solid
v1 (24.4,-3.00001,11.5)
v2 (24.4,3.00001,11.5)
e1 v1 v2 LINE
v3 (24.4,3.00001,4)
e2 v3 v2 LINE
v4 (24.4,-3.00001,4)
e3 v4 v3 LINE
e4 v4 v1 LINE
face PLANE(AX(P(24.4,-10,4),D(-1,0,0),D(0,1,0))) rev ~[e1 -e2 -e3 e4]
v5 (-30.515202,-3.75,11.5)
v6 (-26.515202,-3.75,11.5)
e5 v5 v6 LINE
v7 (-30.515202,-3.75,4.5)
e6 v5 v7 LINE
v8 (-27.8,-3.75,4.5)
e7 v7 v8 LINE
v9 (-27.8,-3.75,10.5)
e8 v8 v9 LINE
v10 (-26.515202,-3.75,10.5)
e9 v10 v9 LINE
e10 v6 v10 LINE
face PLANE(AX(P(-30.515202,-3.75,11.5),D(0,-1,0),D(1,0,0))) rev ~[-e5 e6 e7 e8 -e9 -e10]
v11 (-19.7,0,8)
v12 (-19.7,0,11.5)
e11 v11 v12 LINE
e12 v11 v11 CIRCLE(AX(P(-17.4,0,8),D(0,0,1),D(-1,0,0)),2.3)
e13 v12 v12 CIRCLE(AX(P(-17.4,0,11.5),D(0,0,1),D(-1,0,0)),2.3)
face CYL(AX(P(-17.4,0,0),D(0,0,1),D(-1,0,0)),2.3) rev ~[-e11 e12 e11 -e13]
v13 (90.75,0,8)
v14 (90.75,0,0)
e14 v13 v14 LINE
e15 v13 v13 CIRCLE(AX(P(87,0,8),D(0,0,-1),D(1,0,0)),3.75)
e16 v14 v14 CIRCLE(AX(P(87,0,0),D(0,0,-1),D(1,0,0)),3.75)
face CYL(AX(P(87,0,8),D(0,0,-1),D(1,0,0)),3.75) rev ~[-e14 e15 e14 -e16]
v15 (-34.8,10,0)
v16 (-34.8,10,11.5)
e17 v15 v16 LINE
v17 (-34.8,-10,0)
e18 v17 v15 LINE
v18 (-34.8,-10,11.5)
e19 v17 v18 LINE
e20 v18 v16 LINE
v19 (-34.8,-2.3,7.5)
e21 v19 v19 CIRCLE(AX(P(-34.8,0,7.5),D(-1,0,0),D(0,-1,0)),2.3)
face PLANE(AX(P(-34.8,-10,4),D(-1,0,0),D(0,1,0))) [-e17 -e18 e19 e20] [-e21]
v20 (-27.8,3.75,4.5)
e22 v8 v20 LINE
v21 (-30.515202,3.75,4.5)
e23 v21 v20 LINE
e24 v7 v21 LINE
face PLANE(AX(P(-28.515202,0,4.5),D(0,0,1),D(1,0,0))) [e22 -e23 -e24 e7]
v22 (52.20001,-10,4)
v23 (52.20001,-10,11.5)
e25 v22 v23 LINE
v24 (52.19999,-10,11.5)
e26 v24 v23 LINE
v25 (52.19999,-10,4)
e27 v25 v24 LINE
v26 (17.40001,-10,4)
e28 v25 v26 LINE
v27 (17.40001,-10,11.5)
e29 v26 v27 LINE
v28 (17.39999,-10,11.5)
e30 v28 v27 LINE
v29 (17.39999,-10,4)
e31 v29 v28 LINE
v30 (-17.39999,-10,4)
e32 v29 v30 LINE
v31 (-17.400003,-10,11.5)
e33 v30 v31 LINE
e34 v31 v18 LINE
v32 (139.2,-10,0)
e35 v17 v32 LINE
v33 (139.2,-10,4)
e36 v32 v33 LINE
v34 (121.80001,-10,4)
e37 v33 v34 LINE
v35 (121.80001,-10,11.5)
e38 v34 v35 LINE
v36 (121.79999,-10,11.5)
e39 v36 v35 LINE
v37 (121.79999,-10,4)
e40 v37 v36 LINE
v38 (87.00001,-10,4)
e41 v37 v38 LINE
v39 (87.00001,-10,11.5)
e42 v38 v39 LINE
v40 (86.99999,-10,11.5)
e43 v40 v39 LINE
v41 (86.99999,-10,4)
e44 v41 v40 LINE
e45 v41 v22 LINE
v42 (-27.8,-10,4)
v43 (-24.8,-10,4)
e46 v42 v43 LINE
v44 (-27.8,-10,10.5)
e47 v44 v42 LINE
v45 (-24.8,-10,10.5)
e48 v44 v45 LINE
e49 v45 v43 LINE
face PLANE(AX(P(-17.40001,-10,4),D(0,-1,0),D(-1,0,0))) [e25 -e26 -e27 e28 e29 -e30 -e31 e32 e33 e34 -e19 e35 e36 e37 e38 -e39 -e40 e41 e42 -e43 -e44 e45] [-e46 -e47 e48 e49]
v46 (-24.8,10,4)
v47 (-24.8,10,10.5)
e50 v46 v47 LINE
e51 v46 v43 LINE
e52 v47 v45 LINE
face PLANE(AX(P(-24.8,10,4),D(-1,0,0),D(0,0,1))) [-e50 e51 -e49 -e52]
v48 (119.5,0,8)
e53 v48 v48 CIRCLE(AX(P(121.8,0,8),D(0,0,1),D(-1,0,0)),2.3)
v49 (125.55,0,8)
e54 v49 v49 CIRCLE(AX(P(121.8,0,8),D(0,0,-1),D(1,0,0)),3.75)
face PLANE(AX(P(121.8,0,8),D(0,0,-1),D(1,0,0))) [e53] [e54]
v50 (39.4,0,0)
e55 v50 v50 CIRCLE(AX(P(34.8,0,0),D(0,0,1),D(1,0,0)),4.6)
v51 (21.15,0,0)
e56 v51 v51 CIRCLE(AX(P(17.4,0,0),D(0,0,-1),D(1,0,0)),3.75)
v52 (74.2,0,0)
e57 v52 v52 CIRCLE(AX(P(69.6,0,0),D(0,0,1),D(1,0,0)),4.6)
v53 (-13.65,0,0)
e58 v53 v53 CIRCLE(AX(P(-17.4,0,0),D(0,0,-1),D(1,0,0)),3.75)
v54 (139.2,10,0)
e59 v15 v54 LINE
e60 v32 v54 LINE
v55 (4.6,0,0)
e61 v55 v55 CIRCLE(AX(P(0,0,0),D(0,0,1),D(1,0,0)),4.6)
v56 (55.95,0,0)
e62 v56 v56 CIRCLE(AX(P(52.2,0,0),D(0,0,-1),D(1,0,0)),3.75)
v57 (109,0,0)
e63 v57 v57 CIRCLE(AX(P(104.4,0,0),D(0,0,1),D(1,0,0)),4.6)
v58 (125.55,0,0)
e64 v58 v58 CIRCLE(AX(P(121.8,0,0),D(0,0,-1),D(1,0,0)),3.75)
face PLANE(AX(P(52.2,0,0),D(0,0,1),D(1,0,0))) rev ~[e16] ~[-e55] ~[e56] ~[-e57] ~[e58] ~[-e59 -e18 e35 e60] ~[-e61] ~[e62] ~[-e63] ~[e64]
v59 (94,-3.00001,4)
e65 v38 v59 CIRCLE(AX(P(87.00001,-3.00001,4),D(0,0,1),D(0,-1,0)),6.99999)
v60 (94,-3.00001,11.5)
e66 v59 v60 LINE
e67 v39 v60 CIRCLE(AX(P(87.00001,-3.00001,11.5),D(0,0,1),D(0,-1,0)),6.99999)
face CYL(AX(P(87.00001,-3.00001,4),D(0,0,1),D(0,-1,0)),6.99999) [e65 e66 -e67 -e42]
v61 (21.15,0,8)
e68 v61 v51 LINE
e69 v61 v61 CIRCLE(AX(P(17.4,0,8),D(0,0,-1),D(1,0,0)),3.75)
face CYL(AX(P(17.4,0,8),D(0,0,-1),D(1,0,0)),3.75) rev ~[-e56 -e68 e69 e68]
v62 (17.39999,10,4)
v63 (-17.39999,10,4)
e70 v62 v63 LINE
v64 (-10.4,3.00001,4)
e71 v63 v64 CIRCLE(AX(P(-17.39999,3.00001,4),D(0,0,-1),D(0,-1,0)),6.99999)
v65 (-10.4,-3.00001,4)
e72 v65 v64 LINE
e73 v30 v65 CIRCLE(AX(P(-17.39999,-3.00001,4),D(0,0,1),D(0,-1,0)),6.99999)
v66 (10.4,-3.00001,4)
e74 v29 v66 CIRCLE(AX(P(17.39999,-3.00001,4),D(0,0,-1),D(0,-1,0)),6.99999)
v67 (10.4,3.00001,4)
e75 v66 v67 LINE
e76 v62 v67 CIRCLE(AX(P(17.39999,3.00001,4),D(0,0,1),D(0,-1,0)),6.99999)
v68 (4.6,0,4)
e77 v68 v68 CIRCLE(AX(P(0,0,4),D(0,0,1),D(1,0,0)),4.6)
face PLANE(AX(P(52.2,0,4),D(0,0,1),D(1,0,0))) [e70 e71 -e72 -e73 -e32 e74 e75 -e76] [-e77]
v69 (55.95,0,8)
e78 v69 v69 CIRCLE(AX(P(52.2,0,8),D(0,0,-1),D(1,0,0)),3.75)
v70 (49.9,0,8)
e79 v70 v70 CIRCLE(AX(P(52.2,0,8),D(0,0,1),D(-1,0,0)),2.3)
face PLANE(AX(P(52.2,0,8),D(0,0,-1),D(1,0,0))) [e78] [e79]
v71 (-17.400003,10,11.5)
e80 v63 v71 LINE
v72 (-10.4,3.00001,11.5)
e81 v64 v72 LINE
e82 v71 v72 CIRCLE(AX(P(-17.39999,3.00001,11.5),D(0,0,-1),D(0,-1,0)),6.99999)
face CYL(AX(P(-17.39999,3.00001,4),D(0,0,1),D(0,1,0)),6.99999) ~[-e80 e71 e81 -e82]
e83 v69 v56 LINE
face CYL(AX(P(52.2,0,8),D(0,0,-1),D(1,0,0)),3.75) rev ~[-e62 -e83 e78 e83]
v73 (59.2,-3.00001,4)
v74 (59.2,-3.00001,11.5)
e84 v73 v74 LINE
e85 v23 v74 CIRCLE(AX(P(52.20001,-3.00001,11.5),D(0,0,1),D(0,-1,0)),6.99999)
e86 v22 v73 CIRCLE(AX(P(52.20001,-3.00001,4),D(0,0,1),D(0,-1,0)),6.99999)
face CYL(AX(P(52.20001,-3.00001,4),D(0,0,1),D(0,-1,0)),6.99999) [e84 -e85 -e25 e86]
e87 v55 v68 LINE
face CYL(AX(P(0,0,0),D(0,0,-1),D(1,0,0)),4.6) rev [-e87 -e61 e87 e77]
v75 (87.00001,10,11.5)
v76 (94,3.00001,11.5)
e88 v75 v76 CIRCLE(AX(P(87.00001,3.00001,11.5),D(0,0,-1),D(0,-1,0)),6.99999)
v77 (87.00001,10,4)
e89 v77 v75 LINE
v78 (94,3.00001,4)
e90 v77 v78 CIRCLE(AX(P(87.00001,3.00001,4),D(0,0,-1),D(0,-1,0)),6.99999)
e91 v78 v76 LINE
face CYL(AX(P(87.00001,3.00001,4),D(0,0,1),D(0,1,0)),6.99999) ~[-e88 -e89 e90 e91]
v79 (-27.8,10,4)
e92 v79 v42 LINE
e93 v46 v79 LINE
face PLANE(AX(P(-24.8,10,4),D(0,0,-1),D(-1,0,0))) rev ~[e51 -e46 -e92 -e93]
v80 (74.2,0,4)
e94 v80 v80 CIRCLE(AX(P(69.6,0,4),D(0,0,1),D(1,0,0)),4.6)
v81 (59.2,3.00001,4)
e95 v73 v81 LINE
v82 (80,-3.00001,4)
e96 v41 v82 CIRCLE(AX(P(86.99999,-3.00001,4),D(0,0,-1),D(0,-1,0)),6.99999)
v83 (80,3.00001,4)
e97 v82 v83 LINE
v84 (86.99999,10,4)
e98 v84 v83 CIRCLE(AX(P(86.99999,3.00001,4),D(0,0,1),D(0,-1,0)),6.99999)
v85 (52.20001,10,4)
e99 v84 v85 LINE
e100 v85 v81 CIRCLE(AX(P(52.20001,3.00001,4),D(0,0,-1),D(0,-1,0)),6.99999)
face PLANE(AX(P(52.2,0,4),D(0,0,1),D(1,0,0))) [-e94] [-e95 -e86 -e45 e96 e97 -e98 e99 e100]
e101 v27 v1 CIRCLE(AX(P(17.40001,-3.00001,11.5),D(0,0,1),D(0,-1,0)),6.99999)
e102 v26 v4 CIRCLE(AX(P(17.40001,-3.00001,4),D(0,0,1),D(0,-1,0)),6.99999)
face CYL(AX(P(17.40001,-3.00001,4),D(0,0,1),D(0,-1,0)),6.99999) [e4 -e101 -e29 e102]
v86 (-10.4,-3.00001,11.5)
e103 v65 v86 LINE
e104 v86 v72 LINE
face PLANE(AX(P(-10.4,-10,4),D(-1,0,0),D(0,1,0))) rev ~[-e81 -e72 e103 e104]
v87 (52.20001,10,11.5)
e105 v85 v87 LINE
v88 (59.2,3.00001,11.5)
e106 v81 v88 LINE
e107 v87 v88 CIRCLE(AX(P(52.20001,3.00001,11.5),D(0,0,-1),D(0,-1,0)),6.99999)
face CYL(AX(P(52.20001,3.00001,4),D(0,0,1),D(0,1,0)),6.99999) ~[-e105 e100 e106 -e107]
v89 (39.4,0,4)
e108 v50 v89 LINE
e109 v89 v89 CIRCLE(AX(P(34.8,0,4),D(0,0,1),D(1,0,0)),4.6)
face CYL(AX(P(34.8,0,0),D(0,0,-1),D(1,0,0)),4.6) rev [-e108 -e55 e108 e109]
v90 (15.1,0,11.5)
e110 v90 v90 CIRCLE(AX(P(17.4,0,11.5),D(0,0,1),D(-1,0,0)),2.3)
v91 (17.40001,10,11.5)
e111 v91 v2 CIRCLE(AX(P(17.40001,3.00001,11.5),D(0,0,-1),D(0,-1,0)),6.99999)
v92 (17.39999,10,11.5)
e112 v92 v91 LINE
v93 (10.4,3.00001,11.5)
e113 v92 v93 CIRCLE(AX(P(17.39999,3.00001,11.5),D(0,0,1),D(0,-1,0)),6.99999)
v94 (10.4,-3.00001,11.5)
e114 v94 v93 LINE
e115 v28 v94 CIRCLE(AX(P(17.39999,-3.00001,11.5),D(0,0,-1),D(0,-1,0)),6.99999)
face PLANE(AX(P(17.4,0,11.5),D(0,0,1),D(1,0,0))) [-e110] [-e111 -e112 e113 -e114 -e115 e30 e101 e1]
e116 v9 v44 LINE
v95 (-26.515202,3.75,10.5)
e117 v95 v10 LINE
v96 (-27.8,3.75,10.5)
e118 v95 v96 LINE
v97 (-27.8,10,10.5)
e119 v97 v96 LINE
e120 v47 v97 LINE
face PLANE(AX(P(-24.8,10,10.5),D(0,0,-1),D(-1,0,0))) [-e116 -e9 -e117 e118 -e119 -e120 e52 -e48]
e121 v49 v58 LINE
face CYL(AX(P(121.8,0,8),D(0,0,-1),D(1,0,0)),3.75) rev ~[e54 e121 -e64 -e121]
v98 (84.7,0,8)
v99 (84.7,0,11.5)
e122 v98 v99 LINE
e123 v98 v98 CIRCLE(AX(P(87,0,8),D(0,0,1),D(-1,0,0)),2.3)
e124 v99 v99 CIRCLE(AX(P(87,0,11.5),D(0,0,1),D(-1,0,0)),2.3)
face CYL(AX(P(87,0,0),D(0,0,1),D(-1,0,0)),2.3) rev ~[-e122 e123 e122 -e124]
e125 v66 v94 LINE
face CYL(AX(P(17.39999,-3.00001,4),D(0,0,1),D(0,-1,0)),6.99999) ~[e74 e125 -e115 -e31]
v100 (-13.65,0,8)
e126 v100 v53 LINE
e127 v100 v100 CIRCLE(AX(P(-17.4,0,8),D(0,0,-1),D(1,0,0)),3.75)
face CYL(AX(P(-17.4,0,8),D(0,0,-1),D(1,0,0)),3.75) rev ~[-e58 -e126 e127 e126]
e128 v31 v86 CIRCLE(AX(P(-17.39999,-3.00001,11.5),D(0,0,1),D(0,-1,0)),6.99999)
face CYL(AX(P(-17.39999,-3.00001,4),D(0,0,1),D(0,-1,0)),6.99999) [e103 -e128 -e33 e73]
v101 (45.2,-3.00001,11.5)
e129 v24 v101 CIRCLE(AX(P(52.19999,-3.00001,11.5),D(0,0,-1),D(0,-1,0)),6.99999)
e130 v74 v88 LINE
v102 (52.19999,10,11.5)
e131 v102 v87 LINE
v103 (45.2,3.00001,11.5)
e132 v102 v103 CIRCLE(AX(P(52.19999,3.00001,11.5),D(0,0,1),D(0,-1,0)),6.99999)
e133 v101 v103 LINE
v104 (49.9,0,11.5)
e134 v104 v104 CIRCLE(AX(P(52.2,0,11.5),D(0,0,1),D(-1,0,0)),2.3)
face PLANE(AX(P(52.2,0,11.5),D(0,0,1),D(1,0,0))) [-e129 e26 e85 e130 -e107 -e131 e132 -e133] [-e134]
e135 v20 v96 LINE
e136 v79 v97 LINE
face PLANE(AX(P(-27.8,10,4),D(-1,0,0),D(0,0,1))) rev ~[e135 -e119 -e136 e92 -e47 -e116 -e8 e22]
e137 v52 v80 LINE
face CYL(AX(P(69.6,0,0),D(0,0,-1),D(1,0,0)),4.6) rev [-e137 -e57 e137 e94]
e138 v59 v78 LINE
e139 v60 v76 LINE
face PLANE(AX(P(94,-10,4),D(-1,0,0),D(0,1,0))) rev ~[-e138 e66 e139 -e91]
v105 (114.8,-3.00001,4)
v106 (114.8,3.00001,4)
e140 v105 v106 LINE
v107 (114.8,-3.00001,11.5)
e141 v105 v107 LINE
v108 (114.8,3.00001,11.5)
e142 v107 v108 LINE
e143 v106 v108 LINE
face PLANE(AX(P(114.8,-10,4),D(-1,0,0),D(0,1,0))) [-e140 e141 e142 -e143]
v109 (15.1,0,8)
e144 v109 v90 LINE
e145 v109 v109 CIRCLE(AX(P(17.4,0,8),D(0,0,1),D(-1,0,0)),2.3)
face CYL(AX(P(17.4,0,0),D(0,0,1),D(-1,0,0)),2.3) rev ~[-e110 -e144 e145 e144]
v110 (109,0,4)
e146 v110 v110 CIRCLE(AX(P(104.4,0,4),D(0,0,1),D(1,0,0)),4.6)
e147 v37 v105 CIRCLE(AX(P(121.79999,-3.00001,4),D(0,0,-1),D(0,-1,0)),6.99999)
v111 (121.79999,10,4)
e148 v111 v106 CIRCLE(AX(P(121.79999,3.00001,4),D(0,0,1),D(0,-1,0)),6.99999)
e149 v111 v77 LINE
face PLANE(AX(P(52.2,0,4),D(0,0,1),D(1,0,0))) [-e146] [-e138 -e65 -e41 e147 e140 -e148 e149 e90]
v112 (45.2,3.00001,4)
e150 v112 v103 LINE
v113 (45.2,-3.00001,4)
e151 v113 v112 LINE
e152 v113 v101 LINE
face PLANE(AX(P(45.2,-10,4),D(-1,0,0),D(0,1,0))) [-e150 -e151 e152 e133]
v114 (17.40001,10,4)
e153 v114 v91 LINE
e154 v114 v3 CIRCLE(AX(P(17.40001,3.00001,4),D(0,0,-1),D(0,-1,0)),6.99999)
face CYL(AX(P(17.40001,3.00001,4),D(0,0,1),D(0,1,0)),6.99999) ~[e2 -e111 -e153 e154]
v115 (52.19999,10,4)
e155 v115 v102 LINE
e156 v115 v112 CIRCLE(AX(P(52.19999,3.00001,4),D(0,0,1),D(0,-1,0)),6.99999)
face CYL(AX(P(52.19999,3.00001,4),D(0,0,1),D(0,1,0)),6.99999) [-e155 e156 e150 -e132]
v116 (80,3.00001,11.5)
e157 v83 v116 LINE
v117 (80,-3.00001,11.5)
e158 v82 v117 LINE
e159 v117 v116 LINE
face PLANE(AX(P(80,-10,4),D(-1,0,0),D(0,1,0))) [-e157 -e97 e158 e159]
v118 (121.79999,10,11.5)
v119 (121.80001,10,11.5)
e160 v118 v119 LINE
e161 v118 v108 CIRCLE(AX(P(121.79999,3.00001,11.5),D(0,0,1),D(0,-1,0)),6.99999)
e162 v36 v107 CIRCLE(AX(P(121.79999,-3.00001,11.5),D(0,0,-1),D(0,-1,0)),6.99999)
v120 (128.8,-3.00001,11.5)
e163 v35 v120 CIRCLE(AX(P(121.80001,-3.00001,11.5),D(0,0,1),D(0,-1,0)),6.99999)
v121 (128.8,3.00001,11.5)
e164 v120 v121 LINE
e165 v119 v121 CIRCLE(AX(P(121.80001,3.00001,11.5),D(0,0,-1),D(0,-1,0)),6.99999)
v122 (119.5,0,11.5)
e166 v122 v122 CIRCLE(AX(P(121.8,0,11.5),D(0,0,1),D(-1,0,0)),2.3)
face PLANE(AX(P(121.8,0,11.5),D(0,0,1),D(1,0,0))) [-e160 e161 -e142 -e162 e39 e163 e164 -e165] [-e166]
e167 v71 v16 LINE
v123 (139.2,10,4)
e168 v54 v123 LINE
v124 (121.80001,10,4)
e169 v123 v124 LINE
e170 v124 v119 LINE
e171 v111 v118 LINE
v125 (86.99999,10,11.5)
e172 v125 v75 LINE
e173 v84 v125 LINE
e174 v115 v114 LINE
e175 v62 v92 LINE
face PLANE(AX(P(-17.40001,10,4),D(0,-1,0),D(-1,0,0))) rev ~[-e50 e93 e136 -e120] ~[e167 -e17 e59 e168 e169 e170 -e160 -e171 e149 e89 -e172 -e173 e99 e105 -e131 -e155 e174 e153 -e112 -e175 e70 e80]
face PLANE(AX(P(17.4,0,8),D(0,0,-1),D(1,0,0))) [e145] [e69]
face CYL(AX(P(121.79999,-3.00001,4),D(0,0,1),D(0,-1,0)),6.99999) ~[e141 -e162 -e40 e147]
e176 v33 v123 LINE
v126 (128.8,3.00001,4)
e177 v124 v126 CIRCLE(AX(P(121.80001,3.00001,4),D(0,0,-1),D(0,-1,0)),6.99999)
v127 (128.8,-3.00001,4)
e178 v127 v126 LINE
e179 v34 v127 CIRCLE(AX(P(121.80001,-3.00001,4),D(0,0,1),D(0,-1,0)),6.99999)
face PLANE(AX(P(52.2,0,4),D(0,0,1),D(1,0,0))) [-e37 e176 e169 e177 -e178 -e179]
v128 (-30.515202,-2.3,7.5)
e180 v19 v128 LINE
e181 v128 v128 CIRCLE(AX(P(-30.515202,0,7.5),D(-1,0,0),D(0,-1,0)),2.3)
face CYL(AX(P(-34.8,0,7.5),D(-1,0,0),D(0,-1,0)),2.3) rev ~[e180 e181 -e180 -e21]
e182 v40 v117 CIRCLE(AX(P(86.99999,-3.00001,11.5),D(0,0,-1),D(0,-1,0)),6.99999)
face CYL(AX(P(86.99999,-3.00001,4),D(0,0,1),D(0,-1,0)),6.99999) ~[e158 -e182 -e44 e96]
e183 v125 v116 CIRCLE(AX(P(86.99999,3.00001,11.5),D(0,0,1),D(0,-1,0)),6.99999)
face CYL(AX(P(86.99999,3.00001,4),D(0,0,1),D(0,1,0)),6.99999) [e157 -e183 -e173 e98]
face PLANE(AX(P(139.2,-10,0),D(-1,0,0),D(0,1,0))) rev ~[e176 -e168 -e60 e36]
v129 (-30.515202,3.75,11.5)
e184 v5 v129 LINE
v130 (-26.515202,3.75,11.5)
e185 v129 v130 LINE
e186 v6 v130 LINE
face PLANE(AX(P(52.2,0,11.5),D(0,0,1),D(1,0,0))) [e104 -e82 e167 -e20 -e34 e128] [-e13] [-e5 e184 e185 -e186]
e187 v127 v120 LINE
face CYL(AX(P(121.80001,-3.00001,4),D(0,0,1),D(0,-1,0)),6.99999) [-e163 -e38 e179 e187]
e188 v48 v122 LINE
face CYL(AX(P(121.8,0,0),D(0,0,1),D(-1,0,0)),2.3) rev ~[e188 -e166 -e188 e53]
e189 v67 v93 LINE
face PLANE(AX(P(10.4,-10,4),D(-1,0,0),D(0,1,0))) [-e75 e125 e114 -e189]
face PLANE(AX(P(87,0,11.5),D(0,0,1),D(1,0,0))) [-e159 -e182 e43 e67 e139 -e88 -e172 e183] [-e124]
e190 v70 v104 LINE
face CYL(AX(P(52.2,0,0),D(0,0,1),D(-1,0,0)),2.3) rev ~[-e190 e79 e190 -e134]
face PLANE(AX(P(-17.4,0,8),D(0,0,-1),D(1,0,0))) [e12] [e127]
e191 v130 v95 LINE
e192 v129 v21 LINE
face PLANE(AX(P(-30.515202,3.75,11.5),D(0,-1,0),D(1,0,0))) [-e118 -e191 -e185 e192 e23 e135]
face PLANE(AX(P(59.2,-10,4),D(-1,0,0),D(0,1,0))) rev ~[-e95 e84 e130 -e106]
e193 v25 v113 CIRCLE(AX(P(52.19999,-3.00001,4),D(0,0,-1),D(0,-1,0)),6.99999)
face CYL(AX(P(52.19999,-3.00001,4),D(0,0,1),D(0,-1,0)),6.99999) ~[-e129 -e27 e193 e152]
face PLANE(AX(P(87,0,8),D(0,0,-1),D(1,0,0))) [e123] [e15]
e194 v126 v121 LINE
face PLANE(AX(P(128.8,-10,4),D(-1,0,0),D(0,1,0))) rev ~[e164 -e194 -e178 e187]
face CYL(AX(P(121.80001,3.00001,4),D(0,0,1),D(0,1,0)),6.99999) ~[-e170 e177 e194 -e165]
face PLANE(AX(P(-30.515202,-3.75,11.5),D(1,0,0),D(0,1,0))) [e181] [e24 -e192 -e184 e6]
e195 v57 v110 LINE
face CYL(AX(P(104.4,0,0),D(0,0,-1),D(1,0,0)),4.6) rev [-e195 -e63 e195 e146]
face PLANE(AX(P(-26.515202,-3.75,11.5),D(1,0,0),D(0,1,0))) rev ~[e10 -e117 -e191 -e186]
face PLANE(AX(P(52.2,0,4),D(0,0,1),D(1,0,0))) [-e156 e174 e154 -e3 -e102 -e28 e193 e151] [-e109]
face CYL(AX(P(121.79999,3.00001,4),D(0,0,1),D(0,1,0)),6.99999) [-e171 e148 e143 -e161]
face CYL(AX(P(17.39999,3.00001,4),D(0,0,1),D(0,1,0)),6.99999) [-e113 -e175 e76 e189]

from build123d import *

# Parameters (mm, degrees)
F0_W           = 174
F0_H           = 20
F0_R           = 4.6
F1_DEPTH       = 4
F2_W           = 14
F2_H           = 20
F3_DEPTH       = 7.5
F5_D           = 4.6
F5_CBORE_D     = 7.5
F5_CBORE_DEPTH = 8
F6_R           = 6.99999
F7_DEPTH       = 7.5
F8_W           = 3
F8_H           = 6.5
F9_DEPTH       = 25
F10_W          = 4
F10_H          = 7.5
F11_DEPTH      = 7
F12_R          = 2.3
F13_DEPTH      = 10


# Not quite as in the source:
# - a fillet or chamfer is up to 0.001 mm smaller than in the source, because OpenCascade refuses the exact size


with BuildPart() as f1:
    # F0 (on Top) → F1 (new body)
    with BuildSketch(Plane.XY):
        with Locations((52.2, 0)):
            Rectangle(F0_W, F0_H)
        Circle(F0_R, mode=Mode.SUBTRACT)
        with Locations((34.8, 0)):
            Circle(F0_R, mode=Mode.SUBTRACT)
        with Locations((69.6, 0)):
            Circle(F0_R, mode=Mode.SUBTRACT)
        with Locations((104.4, 0)):
            Circle(F0_R, mode=Mode.SUBTRACT)
    extrude(amount=F1_DEPTH)

    # F2 (on face) → F3 (join)
    with BuildSketch(Plane.XY.offset(4)):
        with Locations((-17.4, 0)):
            Rectangle(F2_W, F2_H)
        with Locations((17.4, 0)):
            Rectangle(F2_W, F2_H)
        with Locations((52.2, 0)):
            Rectangle(F2_W, F2_H)
        with Locations((87, 0)):
            Rectangle(F2_W, F2_H)
        with Locations((121.8, 0)):
            Rectangle(F2_W, F2_H)
    extrude(amount=F3_DEPTH)

    # F5 (through all)
    with Locations(Plane(origin=(0, 0, 0), x_dir=(1, 0, 0), z_dir=(0, 0, -1))):
        with Locations((-17.4, 0), (17.4, 0), (52.2, 0), (87, 0), (121.8, 0)):
            CounterBoreHole(F5_D / 2, F5_CBORE_D / 2, F5_CBORE_DEPTH)

    # F6 (radius 7 in the source; OpenCascade refuses exactly that, so slightly less here)
    f6_edges = [f1.edges().sort_by_distance(p)[0] for p in [
        (-10.4, 10, 7.75),
        (10.4, 10, 7.75),
        (24.4, 10, 7.75),
        (45.2, 10, 7.75),
        (59.2, 10, 7.75),
        (80, 10, 7.75),
        (94, 10, 7.75),
        (128.8, 10, 7.75),
        (114.8, 10, 7.75),
        (-24.4, 10, 7.75),
        (-24.4, -10, 7.75),
        (-10.4, -10, 7.75),
        (10.4, -10, 7.75),
        (24.4, -10, 7.75),
        (45.2, -10, 7.75),
        (59.2, -10, 7.75),
        (80, -10, 7.75),
        (94, -10, 7.75),
        (114.8, -10, 7.75),
        (128.8, -10, 7.75),
    ]]
    fillet(f6_edges, radius=F6_R)

    # F7 (add): a face of the model
    f7_faces = [f1.faces().sort_by_distance(p)[0] for p in [
        (-28.9789302808, 0, 4),
    ]]
    extrude(f7_faces, amount=F7_DEPTH)

    # F8 (on face) → F9 (cut)
    with BuildSketch(Plane(origin=(0, 10, 0), x_dir=(-1, 0, 0), z_dir=(0, 1, 0))):
        with Locations((26.3, 7.25)):
            Rectangle(F8_W, F8_H)
    extrude(amount=-F9_DEPTH, mode=Mode.SUBTRACT)

    # F10 (on face) → F11 (cut)
    with BuildSketch(Plane.XY.offset(11.5)):
        with Locations((-28.5152019933, 0)):
            Rectangle(F10_W, F10_H)
    extrude(amount=-F11_DEPTH, mode=Mode.SUBTRACT)

    # F12 (on face) → F13 (cut)
    with BuildSketch(Plane(origin=(-34.8, 0, 0), x_dir=(0, -1, 0), z_dir=(-1, 0, 0))):
        with Locations((0, 7.5)):
            Circle(F12_R)
    extrude(amount=-F13_DEPTH, mode=Mode.SUBTRACT)


solid = f1.part
